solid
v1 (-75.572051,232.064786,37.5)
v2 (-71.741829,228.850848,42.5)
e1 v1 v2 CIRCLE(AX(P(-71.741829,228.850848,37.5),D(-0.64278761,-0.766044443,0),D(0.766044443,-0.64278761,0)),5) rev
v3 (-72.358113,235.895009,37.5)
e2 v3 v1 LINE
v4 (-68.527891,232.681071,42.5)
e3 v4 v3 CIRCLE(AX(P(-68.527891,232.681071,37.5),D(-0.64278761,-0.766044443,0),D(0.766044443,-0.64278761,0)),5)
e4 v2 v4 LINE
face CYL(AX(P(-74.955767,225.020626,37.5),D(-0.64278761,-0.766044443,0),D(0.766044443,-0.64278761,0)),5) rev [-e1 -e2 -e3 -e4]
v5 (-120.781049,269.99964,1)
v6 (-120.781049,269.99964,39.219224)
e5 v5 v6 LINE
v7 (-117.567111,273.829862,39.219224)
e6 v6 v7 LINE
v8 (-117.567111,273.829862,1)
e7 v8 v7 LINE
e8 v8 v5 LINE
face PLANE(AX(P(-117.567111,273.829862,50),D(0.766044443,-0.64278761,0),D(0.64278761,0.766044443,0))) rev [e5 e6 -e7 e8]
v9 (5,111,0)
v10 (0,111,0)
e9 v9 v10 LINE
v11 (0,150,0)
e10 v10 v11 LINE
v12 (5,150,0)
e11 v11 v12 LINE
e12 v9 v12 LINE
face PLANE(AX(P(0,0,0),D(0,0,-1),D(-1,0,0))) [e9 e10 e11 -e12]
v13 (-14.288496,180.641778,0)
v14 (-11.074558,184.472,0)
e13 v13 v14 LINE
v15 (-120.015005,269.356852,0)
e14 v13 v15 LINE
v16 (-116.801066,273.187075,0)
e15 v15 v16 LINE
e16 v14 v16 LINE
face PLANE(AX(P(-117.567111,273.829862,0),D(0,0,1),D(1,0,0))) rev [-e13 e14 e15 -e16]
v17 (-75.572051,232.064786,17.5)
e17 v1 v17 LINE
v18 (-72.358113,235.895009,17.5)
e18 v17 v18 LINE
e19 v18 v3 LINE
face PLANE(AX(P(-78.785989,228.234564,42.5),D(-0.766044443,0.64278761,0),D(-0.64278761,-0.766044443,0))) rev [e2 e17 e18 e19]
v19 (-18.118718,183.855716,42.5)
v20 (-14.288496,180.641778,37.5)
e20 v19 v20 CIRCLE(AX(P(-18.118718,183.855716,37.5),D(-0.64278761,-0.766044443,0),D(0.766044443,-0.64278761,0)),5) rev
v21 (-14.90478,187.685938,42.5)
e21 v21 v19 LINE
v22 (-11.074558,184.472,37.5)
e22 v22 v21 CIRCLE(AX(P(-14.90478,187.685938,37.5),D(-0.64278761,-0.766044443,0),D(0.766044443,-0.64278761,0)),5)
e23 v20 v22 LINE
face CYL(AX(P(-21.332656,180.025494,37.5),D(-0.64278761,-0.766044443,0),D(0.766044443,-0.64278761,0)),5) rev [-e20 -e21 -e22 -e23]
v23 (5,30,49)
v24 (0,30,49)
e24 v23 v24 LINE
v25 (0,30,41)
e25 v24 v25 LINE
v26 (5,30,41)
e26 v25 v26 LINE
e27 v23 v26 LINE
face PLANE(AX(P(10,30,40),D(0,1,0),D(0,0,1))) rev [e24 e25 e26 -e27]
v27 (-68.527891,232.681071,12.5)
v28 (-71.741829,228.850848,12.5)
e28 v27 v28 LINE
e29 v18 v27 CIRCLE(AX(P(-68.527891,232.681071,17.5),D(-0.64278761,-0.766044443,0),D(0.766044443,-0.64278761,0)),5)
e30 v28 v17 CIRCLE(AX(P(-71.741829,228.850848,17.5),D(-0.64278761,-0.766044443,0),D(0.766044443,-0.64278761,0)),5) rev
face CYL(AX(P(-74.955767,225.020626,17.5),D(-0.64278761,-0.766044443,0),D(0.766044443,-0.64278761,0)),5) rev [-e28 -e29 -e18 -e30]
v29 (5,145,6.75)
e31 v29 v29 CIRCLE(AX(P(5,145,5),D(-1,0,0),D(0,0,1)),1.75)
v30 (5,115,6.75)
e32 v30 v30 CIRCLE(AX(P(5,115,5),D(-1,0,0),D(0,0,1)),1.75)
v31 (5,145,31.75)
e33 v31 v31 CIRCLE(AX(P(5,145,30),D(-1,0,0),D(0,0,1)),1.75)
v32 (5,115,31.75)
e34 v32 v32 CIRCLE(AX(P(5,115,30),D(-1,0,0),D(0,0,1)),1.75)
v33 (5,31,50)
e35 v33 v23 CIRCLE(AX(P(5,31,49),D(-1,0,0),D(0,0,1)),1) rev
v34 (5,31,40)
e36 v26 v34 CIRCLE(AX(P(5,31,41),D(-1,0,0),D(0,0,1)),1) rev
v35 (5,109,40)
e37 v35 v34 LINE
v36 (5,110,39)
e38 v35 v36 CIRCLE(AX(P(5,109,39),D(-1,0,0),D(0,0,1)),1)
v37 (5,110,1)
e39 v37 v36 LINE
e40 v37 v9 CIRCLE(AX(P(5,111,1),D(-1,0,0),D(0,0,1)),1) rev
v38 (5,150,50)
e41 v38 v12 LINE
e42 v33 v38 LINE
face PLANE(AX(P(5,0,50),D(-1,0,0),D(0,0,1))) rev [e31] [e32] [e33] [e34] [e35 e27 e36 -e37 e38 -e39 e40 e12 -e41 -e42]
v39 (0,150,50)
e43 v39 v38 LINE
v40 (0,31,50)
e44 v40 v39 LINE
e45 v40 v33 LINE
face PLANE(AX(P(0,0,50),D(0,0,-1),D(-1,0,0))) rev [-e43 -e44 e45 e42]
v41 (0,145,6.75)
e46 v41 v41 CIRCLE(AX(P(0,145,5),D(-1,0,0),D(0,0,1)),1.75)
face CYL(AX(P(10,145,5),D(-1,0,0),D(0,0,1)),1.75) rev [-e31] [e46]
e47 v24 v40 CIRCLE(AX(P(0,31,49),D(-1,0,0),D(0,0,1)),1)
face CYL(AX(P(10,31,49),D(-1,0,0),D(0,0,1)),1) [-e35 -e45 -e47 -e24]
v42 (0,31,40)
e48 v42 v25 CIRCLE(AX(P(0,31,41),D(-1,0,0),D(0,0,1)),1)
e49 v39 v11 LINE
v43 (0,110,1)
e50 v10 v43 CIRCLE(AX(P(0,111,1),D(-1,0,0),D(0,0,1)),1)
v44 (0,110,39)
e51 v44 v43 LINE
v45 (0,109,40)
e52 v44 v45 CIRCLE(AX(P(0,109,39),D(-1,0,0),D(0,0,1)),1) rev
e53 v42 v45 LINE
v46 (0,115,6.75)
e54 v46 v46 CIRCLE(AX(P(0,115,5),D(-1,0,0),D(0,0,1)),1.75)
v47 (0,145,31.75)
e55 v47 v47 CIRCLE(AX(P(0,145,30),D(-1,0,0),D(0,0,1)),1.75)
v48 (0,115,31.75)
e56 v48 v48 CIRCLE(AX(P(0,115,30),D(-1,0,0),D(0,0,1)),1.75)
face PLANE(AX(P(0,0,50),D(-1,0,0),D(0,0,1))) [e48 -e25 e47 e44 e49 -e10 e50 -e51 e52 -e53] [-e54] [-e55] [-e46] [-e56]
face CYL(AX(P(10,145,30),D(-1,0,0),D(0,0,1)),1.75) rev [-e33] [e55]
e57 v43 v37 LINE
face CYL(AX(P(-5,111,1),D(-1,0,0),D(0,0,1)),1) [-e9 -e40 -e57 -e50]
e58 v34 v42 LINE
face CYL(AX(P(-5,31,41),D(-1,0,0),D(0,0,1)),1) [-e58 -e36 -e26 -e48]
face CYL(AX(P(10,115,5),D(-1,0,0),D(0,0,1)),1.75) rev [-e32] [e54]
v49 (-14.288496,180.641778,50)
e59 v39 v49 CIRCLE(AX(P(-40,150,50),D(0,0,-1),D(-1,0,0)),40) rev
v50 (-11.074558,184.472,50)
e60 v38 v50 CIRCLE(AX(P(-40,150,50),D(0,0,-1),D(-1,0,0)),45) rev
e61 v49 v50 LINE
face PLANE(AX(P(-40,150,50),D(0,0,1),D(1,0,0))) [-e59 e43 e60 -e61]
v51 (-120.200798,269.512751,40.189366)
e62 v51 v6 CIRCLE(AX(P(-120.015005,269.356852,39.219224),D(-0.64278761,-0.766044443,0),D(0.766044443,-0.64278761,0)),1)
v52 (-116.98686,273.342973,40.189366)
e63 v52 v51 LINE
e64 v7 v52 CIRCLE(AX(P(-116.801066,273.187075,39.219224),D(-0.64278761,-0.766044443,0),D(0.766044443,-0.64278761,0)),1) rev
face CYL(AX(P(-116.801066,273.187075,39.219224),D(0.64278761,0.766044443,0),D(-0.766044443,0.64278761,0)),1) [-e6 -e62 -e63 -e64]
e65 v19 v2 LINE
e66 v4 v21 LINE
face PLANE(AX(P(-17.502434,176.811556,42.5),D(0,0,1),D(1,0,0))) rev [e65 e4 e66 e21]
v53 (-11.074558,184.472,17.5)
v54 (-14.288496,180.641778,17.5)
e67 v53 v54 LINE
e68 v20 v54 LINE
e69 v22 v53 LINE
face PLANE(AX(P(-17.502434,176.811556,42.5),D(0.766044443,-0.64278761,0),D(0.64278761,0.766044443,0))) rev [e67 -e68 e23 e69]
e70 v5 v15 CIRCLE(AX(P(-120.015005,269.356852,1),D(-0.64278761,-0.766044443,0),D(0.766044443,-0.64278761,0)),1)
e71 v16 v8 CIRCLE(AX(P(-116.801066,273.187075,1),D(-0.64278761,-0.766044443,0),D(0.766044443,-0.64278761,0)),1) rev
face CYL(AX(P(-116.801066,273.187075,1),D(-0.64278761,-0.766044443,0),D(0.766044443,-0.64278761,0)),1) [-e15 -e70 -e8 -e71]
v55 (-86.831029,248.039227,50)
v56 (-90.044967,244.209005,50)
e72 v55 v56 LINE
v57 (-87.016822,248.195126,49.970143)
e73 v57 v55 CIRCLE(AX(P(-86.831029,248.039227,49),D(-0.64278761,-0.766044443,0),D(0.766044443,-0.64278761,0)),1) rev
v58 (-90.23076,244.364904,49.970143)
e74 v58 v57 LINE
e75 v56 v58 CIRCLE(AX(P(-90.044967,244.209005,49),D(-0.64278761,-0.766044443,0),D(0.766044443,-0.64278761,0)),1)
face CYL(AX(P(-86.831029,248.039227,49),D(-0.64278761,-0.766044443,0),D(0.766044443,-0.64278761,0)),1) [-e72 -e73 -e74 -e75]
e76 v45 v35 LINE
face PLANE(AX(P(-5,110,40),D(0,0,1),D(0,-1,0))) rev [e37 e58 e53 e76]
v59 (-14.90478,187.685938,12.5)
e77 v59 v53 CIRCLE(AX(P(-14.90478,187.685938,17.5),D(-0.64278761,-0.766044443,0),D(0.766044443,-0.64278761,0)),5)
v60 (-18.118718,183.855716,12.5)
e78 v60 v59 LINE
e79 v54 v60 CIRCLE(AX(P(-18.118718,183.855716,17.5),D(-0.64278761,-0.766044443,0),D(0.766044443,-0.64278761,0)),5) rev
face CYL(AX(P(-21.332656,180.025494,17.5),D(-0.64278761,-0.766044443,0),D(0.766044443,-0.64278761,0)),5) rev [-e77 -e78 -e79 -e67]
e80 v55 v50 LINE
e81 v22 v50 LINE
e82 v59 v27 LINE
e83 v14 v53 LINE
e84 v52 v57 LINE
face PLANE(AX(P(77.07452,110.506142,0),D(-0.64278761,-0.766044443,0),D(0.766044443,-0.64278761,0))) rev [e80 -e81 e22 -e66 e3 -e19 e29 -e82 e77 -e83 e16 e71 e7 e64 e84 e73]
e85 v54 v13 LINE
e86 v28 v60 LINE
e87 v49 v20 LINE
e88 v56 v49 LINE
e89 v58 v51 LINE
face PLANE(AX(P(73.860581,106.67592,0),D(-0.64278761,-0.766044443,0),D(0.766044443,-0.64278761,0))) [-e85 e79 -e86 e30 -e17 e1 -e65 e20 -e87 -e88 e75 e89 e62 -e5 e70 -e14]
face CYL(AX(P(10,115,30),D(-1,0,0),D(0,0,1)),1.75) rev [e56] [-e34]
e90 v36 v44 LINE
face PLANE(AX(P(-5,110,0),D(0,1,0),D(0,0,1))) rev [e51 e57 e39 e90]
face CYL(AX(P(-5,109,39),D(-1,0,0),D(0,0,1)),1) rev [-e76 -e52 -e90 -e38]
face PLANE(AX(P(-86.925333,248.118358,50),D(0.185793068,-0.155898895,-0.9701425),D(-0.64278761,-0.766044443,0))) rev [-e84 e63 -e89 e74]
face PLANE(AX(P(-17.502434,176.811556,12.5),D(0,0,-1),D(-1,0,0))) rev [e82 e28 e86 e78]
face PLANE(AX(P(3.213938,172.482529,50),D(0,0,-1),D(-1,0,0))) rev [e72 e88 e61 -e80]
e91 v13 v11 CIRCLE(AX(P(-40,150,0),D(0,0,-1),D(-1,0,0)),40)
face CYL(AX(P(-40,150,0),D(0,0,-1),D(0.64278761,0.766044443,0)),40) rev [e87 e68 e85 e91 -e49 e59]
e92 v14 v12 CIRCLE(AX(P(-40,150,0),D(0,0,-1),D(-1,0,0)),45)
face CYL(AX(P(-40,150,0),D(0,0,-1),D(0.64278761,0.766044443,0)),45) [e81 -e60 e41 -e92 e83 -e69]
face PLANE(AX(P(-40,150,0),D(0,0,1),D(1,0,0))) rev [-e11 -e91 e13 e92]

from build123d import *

# Parameters (mm, degrees)
SKETCH1_W          = 5
SKETCH1_H          = 150
BASE_FLANGE1_DEPTH = 50
EDGE_FLANGE2_DEPTH = 50
SKETCH2_W          = 40
SKETCH2_H          = 110
CUT_EXTRUDE1_DEPTH = 10
SKETCH6_R          = 1.75
CUT_EXTRUDE2_DEPTH = 10
SKETCH12_W         = 10
SKETCH12_H         = 30
CUT_EXTRUDE3_DEPTH = 10
CHAMFER1_SIZE      = 10
CHAMFER1_SIZE2     = 40
FILLET1_R          = 1
SKETCH17_W         = 80
SKETCH17_H         = 30
CUT_EXTRUDE6_DEPTH = 10
FILLET2_R          = 5


# Sheet-metal steps are written as plain solids
with BuildPart() as part:
    # Sketch1 → Base-Flange1 (new body)
    with BuildSketch(Plane.XY):
        with Locations((2.5, 75)):
            Rectangle(SKETCH1_W, SKETCH1_H)
    extrude(amount=BASE_FLANGE1_DEPTH)

    # Edge-Flange2 section (across the edge) → Edge-Flange2 (add)
    with BuildSketch(Plane(origin=(0, 168.652306326, 50), x_dir=(-0.6427876096865435, -0.7660444431189746, 0), z_dir=(0, 0, -1))):
        with BuildLine():
            Line((-5, 18.652306326), (-5, 157.668461709))
            Line((-5, 157.668461709), (0, 157.668461709))
            Line((0, 157.668461709), (0, 18.652306326))
            ThreePointArc((0, 18.652306326), (3.747688519, 1.747575857), (14.288495613, -11.989471399))
            Line((14.288495613, -11.989471399), (11.074557564, -15.819693614))
            ThreePointArc((11.074557564, -15.819693614), (-0.783850417, -0.365515452), (-5, 18.652306326))
        make_face()
    extrude(amount=EDGE_FLANGE2_DEPTH)

    # Sketch2 → Cut-Extrude1 (cut)
    with BuildSketch(Plane(origin=(5, 0, 0), x_dir=(0, 0, -1), z_dir=(1, 0, 0))):
        with Locations((-20, 55)):
            Rectangle(SKETCH2_W, SKETCH2_H)
    extrude(amount=-CUT_EXTRUDE1_DEPTH, mode=Mode.SUBTRACT)

    # Sketch6 → Cut-Extrude2 (cut)
    with BuildSketch(Plane.ZY):
        with Locations((30, 115)):
            Circle(SKETCH6_R)
        with Locations((5, 115)):
            Circle(SKETCH6_R)
        with Locations((5, 145)):
            Circle(SKETCH6_R)
        with Locations((30, 145)):
            Circle(SKETCH6_R)
    extrude(amount=-CUT_EXTRUDE2_DEPTH, mode=Mode.SUBTRACT)

    # Sketch12 → Cut-Extrude3 (cut)
    with BuildSketch(Plane.ZY):
        with Locations((45, 15)):
            Rectangle(SKETCH12_W, SKETCH12_H)
    extrude(amount=-CUT_EXTRUDE3_DEPTH, mode=Mode.SUBTRACT)

    # Chamfer1
    chamfer1_edges = [part.edges().sort_by_distance(p)[0] for p in [
        (-119.174079923, 271.914751059, 50),
    ]]
    chamfer1_side = [part.faces().sort_by_distance(p)[0] for p in [
        (-119.174079923, 271.914751059, 25),
    ]]
    chamfer(chamfer1_edges, length=CHAMFER1_SIZE, length2=CHAMFER1_SIZE2, reference=chamfer1_side[0])

    # Fillet1
    fillet1_edges = [part.edges().sort_by_distance(p)[0] for p in [
        (-88.532302198, 246.203246672, 50),
        (-119.174079923, 271.914751059, 40),
        (-119.174079923, 271.914751059, 0),
        (2.5, 110, 0),
        (2.5, 110, 40),
        (2.5, 30, 40),
        (2.5, 30, 50),
    ]]
    fillet(fillet1_edges, radius=FILLET1_R)

    # Sketch17 → Cut-Extrude6 (cut)
    with BuildSketch(Plane(origin=(86.258987465, 102.799458205, 0), x_dir=(0.7660444431189746, -0.6427876096865437, 0), z_dir=(0.6427876096865437, 0.7660444431189746, 0))):
        with Locations((-167.059919178, -27.5)):
            Rectangle(SKETCH17_W, SKETCH17_H)
    extrude(amount=-CUT_EXTRUDE6_DEPTH, mode=Mode.SUBTRACT)

    # Fillet2
    fillet2_edges = [part.edges().sort_by_distance(p)[0] for p in [
        (-12.681526588, 182.556888833, 12.5),
        (-12.681526588, 182.556888833, 42.5),
        (-73.965082038, 233.979897607, 42.5),
        (-73.965082038, 233.979897607, 12.5),
    ]]
    fillet(fillet2_edges, radius=FILLET2_R)


solid = part.part
